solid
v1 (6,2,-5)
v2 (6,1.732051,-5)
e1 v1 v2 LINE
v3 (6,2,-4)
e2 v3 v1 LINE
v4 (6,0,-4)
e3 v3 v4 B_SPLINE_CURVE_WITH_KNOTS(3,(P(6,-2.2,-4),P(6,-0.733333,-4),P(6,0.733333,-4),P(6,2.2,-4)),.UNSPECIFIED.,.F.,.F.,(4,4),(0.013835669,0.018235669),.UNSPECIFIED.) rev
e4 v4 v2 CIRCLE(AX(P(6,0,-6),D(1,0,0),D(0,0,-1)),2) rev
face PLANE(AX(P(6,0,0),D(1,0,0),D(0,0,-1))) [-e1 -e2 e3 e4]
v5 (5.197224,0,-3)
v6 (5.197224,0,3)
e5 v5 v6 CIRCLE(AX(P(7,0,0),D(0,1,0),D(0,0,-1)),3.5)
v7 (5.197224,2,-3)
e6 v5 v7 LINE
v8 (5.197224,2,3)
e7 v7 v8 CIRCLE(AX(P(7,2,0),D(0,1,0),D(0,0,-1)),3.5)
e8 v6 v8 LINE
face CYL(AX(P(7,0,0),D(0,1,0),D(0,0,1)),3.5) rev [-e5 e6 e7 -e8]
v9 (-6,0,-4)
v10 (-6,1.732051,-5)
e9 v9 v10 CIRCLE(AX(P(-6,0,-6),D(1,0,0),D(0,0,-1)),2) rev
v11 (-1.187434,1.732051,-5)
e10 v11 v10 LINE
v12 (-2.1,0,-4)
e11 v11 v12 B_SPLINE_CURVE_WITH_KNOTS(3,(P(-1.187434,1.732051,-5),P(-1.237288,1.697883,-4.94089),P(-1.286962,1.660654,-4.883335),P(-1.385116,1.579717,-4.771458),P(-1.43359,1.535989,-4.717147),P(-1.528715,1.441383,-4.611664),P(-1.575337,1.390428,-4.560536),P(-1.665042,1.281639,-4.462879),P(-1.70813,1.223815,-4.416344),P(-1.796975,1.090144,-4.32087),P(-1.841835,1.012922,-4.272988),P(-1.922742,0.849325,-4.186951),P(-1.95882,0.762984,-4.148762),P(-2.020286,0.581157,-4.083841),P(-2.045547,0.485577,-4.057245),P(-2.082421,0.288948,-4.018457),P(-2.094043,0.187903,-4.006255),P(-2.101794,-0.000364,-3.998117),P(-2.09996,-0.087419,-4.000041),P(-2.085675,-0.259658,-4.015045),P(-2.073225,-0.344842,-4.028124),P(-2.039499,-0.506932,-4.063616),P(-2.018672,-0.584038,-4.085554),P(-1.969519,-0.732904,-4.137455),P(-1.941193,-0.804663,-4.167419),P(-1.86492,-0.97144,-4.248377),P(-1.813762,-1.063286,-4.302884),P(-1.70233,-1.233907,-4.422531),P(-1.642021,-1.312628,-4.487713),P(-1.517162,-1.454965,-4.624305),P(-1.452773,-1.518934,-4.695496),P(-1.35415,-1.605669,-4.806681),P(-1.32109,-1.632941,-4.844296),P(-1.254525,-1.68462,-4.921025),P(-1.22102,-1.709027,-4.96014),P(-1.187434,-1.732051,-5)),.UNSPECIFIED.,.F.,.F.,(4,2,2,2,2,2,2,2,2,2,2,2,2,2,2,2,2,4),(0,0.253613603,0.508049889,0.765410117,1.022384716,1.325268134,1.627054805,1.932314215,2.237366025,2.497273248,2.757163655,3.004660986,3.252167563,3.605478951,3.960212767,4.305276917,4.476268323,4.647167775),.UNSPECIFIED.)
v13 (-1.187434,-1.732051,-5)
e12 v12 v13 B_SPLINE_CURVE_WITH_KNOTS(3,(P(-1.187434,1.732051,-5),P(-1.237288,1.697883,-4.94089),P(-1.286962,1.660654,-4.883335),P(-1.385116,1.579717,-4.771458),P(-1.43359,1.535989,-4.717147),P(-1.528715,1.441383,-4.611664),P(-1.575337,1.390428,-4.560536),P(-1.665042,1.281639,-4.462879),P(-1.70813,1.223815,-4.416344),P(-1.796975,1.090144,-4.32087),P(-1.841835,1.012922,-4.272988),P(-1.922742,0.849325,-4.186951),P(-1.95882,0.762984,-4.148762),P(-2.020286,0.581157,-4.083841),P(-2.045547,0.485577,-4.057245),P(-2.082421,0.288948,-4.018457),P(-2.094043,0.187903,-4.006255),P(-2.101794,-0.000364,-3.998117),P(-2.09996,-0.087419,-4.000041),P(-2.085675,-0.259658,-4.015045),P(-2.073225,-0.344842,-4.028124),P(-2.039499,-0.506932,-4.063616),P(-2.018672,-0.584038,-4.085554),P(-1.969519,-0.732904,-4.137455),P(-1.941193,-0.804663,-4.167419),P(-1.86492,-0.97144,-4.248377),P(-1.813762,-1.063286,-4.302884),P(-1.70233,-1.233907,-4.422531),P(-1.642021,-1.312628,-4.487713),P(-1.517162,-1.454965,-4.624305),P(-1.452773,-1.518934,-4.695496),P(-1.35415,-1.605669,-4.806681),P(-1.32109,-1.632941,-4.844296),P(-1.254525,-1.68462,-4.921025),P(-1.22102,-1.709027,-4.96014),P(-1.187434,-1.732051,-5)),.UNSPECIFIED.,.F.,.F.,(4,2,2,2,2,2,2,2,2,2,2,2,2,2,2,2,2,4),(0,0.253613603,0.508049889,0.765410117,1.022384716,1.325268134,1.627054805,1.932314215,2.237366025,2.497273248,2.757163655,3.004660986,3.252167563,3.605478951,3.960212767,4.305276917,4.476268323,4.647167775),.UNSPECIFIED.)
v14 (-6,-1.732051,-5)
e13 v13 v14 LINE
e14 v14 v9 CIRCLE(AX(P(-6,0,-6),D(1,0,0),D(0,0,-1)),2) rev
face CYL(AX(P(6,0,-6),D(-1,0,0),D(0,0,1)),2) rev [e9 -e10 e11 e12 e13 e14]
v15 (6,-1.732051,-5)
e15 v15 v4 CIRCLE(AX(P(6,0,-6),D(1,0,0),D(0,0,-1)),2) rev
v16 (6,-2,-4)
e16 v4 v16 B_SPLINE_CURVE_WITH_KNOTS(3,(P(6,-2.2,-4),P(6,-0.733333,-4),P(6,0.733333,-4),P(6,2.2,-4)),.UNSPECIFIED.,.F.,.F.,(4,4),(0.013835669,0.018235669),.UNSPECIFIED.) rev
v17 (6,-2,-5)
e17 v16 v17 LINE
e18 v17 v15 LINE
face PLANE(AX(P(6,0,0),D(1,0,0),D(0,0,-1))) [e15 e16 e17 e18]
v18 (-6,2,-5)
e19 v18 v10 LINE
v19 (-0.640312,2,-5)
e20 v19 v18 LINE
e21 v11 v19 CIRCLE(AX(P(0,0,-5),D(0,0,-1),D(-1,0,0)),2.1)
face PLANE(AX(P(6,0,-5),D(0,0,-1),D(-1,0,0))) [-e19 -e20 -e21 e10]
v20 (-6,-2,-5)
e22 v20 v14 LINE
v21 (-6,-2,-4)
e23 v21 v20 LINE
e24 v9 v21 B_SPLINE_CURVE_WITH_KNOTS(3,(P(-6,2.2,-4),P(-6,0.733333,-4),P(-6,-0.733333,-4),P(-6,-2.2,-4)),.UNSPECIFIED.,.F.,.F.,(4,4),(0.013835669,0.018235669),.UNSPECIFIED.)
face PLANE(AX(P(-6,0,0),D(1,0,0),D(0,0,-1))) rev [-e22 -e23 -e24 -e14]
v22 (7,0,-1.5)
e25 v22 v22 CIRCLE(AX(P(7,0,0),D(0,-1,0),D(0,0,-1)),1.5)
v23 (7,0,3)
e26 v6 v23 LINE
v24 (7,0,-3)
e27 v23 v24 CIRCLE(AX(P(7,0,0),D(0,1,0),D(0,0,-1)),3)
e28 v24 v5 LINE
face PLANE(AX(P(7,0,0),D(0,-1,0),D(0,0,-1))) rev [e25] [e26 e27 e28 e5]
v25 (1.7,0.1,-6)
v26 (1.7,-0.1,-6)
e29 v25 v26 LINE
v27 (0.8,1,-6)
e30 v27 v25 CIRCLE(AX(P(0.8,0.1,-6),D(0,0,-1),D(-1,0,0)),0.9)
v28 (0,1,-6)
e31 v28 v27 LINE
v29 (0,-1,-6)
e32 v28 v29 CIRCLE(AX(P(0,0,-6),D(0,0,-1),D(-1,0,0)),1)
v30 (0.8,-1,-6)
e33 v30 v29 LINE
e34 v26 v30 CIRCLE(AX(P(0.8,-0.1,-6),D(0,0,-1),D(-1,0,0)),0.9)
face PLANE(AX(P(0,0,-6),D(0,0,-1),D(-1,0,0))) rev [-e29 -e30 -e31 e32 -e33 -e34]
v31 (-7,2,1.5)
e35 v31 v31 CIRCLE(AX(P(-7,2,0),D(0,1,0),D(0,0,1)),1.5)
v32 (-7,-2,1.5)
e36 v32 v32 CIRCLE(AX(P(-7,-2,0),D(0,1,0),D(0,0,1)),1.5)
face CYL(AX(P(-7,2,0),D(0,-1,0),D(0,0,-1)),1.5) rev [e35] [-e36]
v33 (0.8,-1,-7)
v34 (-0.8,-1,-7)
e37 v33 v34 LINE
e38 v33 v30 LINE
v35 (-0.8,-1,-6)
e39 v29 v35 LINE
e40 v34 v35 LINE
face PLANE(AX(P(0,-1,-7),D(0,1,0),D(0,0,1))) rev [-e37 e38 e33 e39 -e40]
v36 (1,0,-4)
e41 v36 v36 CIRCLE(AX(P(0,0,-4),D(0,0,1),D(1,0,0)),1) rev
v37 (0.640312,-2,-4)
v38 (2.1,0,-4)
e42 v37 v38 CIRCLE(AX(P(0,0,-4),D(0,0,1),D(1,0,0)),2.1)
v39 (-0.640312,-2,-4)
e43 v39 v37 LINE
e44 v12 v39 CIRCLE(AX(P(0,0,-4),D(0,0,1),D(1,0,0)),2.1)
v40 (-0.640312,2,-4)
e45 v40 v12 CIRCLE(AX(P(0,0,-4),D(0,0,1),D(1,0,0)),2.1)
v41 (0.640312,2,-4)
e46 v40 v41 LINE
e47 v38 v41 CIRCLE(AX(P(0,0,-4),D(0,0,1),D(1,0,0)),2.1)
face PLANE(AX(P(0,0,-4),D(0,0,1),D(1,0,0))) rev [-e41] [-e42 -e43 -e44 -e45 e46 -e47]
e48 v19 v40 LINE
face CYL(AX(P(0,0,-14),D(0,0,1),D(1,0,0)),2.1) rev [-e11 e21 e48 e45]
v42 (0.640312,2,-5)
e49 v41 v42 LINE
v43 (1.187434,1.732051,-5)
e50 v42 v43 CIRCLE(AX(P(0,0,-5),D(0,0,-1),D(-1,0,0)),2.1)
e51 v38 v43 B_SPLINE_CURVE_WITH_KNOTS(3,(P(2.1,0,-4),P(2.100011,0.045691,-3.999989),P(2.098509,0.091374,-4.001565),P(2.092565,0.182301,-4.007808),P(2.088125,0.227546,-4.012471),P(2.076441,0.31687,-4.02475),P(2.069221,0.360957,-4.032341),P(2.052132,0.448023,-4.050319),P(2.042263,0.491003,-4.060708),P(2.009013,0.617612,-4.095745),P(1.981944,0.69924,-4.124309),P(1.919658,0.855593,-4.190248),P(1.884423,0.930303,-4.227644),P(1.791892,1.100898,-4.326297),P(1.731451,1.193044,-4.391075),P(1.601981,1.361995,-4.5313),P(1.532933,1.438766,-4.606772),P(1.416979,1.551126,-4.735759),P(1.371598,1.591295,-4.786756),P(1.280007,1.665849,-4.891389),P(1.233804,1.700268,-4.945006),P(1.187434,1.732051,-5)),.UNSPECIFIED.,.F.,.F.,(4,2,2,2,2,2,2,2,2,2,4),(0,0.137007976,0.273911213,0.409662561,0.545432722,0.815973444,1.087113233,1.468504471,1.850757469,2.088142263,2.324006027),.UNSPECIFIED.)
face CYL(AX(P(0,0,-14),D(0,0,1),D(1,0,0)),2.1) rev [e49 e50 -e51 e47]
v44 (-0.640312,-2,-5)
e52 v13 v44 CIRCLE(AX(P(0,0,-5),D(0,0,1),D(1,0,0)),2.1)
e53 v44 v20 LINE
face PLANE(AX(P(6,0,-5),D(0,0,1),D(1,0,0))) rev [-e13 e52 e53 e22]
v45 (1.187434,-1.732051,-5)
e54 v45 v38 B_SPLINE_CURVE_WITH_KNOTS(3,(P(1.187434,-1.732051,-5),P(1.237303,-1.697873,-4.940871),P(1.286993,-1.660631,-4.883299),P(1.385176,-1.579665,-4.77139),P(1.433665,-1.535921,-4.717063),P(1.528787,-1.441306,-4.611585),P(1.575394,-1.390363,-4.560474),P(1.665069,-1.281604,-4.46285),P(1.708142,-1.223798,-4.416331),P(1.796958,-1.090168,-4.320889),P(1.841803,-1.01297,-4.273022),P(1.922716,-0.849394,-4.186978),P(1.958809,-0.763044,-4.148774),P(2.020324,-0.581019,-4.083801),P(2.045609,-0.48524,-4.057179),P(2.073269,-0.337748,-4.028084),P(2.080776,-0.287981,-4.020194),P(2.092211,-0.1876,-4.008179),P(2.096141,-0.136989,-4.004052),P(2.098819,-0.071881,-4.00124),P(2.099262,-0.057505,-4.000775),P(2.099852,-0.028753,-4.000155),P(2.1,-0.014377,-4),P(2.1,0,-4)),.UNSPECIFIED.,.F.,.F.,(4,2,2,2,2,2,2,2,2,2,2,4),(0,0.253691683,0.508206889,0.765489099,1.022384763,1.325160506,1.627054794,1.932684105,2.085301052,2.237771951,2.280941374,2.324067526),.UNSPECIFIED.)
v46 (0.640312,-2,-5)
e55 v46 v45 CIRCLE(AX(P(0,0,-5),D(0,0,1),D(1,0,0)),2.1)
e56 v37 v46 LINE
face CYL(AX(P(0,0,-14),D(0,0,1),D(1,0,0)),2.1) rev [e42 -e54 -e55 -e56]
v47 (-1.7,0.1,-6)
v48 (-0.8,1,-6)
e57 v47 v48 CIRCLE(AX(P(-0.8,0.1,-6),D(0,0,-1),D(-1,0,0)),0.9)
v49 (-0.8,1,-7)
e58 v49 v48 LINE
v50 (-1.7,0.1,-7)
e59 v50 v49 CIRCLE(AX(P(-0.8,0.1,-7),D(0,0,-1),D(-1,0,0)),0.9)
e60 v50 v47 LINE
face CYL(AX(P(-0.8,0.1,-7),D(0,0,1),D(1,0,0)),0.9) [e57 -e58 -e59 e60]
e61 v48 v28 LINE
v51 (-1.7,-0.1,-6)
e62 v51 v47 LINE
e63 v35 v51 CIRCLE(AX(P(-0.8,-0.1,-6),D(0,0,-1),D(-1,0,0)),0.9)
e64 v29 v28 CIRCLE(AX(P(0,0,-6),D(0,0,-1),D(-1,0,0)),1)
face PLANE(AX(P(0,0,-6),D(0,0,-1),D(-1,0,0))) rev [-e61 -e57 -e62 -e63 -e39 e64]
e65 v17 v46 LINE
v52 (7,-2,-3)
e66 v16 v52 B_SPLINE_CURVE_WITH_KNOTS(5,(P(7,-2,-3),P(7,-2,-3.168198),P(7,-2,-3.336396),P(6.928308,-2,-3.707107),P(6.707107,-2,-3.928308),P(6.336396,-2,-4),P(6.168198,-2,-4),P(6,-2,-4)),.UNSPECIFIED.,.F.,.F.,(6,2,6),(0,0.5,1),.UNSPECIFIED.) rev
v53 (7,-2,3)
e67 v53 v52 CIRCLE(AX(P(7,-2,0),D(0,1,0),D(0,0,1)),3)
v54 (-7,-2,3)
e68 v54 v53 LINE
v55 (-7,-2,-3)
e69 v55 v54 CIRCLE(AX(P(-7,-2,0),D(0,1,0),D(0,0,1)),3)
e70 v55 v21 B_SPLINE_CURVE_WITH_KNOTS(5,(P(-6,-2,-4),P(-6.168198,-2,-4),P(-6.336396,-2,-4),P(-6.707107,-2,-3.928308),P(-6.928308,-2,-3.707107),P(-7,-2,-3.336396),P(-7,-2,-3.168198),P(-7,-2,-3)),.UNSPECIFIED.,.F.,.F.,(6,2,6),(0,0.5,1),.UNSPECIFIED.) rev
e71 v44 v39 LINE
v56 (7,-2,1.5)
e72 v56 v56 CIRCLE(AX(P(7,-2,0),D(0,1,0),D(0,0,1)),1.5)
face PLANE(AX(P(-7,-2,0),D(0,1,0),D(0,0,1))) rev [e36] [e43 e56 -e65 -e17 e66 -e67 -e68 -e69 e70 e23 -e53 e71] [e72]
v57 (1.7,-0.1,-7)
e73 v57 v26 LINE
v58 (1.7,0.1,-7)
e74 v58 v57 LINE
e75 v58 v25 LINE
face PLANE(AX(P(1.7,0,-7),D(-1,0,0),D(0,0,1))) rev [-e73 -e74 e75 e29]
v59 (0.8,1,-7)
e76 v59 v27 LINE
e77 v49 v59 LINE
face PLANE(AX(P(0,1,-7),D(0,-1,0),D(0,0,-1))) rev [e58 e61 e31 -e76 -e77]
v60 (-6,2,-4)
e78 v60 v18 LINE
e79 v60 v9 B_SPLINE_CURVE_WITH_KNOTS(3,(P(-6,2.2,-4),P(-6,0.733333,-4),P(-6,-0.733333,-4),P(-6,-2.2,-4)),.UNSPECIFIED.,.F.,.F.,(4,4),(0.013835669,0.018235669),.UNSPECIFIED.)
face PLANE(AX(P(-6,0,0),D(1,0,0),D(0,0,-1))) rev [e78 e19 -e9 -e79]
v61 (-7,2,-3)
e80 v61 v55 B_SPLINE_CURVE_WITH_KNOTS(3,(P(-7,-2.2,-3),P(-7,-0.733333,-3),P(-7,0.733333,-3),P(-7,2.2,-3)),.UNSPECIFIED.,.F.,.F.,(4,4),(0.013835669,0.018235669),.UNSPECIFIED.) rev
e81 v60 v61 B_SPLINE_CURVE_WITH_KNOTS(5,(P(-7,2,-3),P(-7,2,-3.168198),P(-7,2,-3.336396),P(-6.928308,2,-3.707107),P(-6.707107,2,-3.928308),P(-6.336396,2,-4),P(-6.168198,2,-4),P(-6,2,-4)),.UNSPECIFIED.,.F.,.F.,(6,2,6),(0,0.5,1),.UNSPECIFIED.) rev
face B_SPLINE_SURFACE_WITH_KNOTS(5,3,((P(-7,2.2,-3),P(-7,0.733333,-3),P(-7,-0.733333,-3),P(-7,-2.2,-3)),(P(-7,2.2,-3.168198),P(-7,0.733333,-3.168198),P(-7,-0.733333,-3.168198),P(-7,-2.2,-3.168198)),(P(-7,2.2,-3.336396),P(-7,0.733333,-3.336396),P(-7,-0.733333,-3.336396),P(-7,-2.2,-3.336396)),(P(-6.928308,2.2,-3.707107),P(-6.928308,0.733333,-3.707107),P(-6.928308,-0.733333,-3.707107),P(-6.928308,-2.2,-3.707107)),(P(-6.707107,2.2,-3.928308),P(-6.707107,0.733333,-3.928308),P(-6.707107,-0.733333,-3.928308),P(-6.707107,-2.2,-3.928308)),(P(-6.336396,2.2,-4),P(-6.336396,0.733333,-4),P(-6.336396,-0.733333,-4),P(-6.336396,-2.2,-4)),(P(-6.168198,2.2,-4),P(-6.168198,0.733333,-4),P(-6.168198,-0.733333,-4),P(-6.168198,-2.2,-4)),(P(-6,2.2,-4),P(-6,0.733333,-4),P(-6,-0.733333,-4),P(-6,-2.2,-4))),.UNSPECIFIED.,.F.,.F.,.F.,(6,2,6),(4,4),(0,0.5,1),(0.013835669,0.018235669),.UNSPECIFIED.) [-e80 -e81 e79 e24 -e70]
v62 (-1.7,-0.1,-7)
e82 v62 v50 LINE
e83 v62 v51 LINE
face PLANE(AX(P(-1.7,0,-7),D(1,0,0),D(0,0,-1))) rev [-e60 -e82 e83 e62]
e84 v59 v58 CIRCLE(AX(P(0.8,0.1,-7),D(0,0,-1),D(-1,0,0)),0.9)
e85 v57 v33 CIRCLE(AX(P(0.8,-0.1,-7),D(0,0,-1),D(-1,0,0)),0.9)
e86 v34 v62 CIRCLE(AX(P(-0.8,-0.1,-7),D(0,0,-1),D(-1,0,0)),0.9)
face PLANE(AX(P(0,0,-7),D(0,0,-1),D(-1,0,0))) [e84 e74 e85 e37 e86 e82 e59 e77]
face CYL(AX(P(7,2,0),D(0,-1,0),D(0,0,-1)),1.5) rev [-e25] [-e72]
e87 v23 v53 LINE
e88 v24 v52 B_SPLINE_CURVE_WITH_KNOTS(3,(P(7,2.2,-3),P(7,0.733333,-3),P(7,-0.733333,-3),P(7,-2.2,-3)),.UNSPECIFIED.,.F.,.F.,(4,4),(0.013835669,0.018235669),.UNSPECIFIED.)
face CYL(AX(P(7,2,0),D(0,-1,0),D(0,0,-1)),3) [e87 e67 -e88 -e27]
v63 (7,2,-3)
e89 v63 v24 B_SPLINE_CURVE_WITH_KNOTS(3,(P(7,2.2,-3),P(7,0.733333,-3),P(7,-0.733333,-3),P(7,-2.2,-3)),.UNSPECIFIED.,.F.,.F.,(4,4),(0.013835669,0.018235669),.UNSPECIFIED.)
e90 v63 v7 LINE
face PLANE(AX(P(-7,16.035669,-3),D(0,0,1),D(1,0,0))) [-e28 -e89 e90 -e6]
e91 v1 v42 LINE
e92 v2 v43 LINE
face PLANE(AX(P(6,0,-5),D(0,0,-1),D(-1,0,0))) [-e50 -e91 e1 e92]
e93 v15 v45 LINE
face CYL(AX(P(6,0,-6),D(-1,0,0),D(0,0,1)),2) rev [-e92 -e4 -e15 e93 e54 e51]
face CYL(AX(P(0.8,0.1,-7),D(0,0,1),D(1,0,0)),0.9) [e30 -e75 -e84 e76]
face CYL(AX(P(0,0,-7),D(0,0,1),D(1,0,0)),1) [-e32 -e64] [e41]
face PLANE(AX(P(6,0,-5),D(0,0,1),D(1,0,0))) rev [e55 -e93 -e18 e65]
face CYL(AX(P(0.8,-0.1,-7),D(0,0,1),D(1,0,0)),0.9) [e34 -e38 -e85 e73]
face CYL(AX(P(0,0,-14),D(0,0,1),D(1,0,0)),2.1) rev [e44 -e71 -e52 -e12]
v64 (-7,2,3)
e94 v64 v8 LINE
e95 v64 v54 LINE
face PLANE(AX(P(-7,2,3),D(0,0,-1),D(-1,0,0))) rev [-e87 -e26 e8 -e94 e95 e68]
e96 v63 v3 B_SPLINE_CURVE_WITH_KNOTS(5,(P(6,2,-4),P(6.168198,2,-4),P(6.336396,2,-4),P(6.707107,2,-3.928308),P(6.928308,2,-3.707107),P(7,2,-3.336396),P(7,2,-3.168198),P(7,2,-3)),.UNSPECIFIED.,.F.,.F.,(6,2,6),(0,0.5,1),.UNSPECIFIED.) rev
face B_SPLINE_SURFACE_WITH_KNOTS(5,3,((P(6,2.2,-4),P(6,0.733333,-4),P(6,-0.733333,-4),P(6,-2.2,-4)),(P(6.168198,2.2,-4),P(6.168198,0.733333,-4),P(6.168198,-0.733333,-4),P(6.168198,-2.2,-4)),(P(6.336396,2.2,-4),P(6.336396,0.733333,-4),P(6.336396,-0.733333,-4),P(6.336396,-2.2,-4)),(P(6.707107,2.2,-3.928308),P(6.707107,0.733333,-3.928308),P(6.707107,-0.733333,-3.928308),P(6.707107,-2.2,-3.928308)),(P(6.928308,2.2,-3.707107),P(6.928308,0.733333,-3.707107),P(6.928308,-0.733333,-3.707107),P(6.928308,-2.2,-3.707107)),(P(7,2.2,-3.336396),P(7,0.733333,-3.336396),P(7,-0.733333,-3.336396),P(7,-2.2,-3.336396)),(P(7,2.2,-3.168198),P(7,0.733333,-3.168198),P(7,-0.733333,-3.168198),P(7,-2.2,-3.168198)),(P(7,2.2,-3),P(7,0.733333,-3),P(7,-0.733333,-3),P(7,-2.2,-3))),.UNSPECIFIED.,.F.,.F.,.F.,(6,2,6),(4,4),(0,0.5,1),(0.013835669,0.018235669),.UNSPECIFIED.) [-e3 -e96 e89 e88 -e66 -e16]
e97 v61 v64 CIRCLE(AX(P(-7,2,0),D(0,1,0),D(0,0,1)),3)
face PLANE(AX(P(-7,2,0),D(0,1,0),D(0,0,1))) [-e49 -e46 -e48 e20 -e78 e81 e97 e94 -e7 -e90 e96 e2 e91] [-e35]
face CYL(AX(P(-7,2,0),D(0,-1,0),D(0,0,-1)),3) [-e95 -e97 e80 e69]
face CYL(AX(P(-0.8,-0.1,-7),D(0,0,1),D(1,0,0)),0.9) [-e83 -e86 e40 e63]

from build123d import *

# Parameters (mm, degrees)
SKETCH1_R                = 1.5
BOSS_EXTRUDE1_DEPTH      = 2
CUT_EXTRUDE1_DEPTH       = 2
BOSS_EXTRUDE2_REACH      = 13.18
SKETCH3_W                = 14
SKETCH3_H                = 1
FILLET1_SIZE             = 1
BOSS_EXTRUDE3_DEPTH      = 6
BOSS_EXTRUDE3_DEPTH_BACK = 6
CUT_EXTRUDE4_START       = -4
SKETCH5_R                = 2.1
CUT_EXTRUDE4_DEPTH       = 10
SKETCH6_R                = 1
BOSS_EXTRUDE5_DEPTH      = 3
BOSS_EXTRUDE6_START      = 2
BOSS_EXTRUDE6_DEPTH      = 1


with BuildPart() as part:
    # Sketch1 → Boss-Extrude1 (new, symmetric)
    with BuildSketch(Plane(origin=(0, 0, 0), x_dir=(1, 0, 0), z_dir=(0, 1, 0))):
        with BuildLine():
            Line((-7, 3), (7, 3))
            ThreePointArc((7, 3), (10, 0), (7, -3))
            Line((7, -3), (-7, -3))
            ThreePointArc((-7, -3), (-10, 0), (-7, 3))
        make_face()
        with Locations(Location((-7, 0, 0), (0, 0, 270))):
            Circle(SKETCH1_R, mode=Mode.SUBTRACT)
        with Locations(Location((7, 0, 0), (0, 0, 270))):
            Circle(SKETCH1_R, mode=Mode.SUBTRACT)
    extrude(amount=BOSS_EXTRUDE1_DEPTH, both=True)

    # Sketch2 → Cut-Extrude1 (cut)
    with BuildSketch(Plane(origin=(0, 2, 0), x_dir=(1, 0, 0), z_dir=(0, 1, 0))):
        with BuildLine():
            Line((5.197224362, 3), (7, 3))
            ThreePointArc((7, 3), (10, 0), (7, -3))
            Line((7, -3), (5.197224362, -3))
            ThreePointArc((5.197224362, -3), (3.5, 0), (5.197224362, 3))
        make_face()
    extrude(amount=-CUT_EXTRUDE1_DEPTH, mode=Mode.SUBTRACT)

    # Boss-Extrude2: up to this face of the body (flat: up to its plane)
    boss_extrude2_end = Plane(part.part.faces().sort_by_distance((-2.270949872, 2, 0))[0])
    # Sketch3 → Boss-Extrude2 (add, up to the picked face)
    with BuildSketch(Plane.XZ.offset(2), mode=Mode.PRIVATE) as boss_extrude2_sk1:
        with Locations((0, -3.5)):
            Rectangle(SKETCH3_W, SKETCH3_H)
    boss_extrude2_tool1 = split(extrude(boss_extrude2_sk1.sketch, amount=-BOSS_EXTRUDE2_REACH, mode=Mode.PRIVATE), bisect_by=boss_extrude2_end, keep=Keep.BOTH, mode=Mode.PRIVATE)
    add(boss_extrude2_tool1.solids().sort_by(Axis((0, -2, -3.5), (0, 1, 0)))[0])

    # Fillet1
    # a fillet whose section is not a circle: 1 mm, written as the material it takes off along each edge
    with BuildSketch(Plane(origin=(7, -4.5, -4), x_dir=(0, 0, 1), z_dir=(0, 1, 0)), Plane(origin=(-7, -4.5, -4), x_dir=(1, 0, 0), z_dir=(0, 1, 0))) as fillet1_piece_1:
        with BuildLine():
            add(Edge.make_bspline([(FILLET1_SIZE, 0), (FILLET1_SIZE * 0.831801948466, 0), (FILLET1_SIZE * 0.663603896932, 0), (FILLET1_SIZE * 0.292893218813, -FILLET1_SIZE * 0.0716919198361), (FILLET1_SIZE * 0.0716919198361, -FILLET1_SIZE * 0.292893218813), (0, -FILLET1_SIZE * 0.663603896932), (0, -FILLET1_SIZE * 0.831801948466), (0, -FILLET1_SIZE)], knots=[0, 0, 0, 0, 0, 0, 0.5, 0.5, 1, 1, 1, 1, 1, 1], degree=5))
            Line((0, -FILLET1_SIZE), (0, 0))
            Line((0, 0), (FILLET1_SIZE, 0))
        make_face()
    extrude(amount=9, mode=Mode.SUBTRACT)

    # Sketch4 → Boss-Extrude3 (add, two sides: drawn at the far end of the back side and taken through both)
    with BuildSketch(Plane(origin=(0, 0, 0), x_dir=(0, 0, -1), z_dir=(1, 0, 0)).offset(-BOSS_EXTRUDE3_DEPTH_BACK)):
        with BuildLine():
            Line((5, 2), (4, 2))
            Line((4, 2), (4, 0))
            ThreePointArc((4, 0), (4.267949192, 1), (5, 1.732050808))
            Line((5, 1.732050808), (5, 2))
        make_face()
        with BuildLine():
            ThreePointArc((5, -1.732050808), (4.267949192, -1), (4, 0))
            Line((4, 0), (4, -2))
            Line((4, -2), (5, -2))
            Line((5, -2), (5, -1.732050808))
        make_face()
    extrude(amount=BOSS_EXTRUDE3_DEPTH + BOSS_EXTRUDE3_DEPTH_BACK)

    # Sketch5 → Cut-Extrude4 (cut)
    with BuildSketch(Plane.XY.offset(CUT_EXTRUDE4_START)):
        Circle(SKETCH5_R)
    extrude(amount=-CUT_EXTRUDE4_DEPTH, mode=Mode.SUBTRACT)

    # Sketch6 → Boss-Extrude5 (add)
    with BuildSketch(Plane(origin=(0, 0, -4), x_dir=(-1, 0, 0), z_dir=(0, 0, -1))):
        with Locations(Location((0, 0, 0), (0, 0, 180))):
            Circle(SKETCH6_R)
    extrude(amount=BOSS_EXTRUDE5_DEPTH)

    # Sketch6<3> → Boss-Extrude6 (add)
    with BuildSketch(Plane(origin=(0, 0, -4), x_dir=(-1, 0, 0), z_dir=(0, 0, -1)).offset(BOSS_EXTRUDE6_START)):
        with BuildLine():
            Line((0.8, 1), (0, 1))
            ThreePointArc((0, 1), (0.707106781, 0.707106781), (1, 0))
            ThreePointArc((1, 0), (0.707106781, -0.707106781), (0, -1))
            Line((0, -1), (0.8, -1))
            ThreePointArc((0.8, -1), (1.436396103, -0.736396103), (1.7, -0.1))
            Line((1.7, -0.1), (1.7, 0.1))
            ThreePointArc((1.7, 0.1), (1.436396103, 0.736396103), (0.8, 1))
        make_face()
        with BuildLine():
            ThreePointArc((0, -1), (-1, 0), (0, 1))
            Line((0, 1), (-0.8, 1))
            ThreePointArc((-0.8, 1), (-1.436396103, 0.736396103), (-1.7, 0.1))
            Line((-1.7, 0.1), (-1.7, -0.1))
            ThreePointArc((-1.7, -0.1), (-1.436396103, -0.736396103), (-0.8, -1))
            Line((-0.8, -1), (0, -1))
        make_face()
    extrude(amount=BOSS_EXTRUDE6_DEPTH)


solid = part.part
